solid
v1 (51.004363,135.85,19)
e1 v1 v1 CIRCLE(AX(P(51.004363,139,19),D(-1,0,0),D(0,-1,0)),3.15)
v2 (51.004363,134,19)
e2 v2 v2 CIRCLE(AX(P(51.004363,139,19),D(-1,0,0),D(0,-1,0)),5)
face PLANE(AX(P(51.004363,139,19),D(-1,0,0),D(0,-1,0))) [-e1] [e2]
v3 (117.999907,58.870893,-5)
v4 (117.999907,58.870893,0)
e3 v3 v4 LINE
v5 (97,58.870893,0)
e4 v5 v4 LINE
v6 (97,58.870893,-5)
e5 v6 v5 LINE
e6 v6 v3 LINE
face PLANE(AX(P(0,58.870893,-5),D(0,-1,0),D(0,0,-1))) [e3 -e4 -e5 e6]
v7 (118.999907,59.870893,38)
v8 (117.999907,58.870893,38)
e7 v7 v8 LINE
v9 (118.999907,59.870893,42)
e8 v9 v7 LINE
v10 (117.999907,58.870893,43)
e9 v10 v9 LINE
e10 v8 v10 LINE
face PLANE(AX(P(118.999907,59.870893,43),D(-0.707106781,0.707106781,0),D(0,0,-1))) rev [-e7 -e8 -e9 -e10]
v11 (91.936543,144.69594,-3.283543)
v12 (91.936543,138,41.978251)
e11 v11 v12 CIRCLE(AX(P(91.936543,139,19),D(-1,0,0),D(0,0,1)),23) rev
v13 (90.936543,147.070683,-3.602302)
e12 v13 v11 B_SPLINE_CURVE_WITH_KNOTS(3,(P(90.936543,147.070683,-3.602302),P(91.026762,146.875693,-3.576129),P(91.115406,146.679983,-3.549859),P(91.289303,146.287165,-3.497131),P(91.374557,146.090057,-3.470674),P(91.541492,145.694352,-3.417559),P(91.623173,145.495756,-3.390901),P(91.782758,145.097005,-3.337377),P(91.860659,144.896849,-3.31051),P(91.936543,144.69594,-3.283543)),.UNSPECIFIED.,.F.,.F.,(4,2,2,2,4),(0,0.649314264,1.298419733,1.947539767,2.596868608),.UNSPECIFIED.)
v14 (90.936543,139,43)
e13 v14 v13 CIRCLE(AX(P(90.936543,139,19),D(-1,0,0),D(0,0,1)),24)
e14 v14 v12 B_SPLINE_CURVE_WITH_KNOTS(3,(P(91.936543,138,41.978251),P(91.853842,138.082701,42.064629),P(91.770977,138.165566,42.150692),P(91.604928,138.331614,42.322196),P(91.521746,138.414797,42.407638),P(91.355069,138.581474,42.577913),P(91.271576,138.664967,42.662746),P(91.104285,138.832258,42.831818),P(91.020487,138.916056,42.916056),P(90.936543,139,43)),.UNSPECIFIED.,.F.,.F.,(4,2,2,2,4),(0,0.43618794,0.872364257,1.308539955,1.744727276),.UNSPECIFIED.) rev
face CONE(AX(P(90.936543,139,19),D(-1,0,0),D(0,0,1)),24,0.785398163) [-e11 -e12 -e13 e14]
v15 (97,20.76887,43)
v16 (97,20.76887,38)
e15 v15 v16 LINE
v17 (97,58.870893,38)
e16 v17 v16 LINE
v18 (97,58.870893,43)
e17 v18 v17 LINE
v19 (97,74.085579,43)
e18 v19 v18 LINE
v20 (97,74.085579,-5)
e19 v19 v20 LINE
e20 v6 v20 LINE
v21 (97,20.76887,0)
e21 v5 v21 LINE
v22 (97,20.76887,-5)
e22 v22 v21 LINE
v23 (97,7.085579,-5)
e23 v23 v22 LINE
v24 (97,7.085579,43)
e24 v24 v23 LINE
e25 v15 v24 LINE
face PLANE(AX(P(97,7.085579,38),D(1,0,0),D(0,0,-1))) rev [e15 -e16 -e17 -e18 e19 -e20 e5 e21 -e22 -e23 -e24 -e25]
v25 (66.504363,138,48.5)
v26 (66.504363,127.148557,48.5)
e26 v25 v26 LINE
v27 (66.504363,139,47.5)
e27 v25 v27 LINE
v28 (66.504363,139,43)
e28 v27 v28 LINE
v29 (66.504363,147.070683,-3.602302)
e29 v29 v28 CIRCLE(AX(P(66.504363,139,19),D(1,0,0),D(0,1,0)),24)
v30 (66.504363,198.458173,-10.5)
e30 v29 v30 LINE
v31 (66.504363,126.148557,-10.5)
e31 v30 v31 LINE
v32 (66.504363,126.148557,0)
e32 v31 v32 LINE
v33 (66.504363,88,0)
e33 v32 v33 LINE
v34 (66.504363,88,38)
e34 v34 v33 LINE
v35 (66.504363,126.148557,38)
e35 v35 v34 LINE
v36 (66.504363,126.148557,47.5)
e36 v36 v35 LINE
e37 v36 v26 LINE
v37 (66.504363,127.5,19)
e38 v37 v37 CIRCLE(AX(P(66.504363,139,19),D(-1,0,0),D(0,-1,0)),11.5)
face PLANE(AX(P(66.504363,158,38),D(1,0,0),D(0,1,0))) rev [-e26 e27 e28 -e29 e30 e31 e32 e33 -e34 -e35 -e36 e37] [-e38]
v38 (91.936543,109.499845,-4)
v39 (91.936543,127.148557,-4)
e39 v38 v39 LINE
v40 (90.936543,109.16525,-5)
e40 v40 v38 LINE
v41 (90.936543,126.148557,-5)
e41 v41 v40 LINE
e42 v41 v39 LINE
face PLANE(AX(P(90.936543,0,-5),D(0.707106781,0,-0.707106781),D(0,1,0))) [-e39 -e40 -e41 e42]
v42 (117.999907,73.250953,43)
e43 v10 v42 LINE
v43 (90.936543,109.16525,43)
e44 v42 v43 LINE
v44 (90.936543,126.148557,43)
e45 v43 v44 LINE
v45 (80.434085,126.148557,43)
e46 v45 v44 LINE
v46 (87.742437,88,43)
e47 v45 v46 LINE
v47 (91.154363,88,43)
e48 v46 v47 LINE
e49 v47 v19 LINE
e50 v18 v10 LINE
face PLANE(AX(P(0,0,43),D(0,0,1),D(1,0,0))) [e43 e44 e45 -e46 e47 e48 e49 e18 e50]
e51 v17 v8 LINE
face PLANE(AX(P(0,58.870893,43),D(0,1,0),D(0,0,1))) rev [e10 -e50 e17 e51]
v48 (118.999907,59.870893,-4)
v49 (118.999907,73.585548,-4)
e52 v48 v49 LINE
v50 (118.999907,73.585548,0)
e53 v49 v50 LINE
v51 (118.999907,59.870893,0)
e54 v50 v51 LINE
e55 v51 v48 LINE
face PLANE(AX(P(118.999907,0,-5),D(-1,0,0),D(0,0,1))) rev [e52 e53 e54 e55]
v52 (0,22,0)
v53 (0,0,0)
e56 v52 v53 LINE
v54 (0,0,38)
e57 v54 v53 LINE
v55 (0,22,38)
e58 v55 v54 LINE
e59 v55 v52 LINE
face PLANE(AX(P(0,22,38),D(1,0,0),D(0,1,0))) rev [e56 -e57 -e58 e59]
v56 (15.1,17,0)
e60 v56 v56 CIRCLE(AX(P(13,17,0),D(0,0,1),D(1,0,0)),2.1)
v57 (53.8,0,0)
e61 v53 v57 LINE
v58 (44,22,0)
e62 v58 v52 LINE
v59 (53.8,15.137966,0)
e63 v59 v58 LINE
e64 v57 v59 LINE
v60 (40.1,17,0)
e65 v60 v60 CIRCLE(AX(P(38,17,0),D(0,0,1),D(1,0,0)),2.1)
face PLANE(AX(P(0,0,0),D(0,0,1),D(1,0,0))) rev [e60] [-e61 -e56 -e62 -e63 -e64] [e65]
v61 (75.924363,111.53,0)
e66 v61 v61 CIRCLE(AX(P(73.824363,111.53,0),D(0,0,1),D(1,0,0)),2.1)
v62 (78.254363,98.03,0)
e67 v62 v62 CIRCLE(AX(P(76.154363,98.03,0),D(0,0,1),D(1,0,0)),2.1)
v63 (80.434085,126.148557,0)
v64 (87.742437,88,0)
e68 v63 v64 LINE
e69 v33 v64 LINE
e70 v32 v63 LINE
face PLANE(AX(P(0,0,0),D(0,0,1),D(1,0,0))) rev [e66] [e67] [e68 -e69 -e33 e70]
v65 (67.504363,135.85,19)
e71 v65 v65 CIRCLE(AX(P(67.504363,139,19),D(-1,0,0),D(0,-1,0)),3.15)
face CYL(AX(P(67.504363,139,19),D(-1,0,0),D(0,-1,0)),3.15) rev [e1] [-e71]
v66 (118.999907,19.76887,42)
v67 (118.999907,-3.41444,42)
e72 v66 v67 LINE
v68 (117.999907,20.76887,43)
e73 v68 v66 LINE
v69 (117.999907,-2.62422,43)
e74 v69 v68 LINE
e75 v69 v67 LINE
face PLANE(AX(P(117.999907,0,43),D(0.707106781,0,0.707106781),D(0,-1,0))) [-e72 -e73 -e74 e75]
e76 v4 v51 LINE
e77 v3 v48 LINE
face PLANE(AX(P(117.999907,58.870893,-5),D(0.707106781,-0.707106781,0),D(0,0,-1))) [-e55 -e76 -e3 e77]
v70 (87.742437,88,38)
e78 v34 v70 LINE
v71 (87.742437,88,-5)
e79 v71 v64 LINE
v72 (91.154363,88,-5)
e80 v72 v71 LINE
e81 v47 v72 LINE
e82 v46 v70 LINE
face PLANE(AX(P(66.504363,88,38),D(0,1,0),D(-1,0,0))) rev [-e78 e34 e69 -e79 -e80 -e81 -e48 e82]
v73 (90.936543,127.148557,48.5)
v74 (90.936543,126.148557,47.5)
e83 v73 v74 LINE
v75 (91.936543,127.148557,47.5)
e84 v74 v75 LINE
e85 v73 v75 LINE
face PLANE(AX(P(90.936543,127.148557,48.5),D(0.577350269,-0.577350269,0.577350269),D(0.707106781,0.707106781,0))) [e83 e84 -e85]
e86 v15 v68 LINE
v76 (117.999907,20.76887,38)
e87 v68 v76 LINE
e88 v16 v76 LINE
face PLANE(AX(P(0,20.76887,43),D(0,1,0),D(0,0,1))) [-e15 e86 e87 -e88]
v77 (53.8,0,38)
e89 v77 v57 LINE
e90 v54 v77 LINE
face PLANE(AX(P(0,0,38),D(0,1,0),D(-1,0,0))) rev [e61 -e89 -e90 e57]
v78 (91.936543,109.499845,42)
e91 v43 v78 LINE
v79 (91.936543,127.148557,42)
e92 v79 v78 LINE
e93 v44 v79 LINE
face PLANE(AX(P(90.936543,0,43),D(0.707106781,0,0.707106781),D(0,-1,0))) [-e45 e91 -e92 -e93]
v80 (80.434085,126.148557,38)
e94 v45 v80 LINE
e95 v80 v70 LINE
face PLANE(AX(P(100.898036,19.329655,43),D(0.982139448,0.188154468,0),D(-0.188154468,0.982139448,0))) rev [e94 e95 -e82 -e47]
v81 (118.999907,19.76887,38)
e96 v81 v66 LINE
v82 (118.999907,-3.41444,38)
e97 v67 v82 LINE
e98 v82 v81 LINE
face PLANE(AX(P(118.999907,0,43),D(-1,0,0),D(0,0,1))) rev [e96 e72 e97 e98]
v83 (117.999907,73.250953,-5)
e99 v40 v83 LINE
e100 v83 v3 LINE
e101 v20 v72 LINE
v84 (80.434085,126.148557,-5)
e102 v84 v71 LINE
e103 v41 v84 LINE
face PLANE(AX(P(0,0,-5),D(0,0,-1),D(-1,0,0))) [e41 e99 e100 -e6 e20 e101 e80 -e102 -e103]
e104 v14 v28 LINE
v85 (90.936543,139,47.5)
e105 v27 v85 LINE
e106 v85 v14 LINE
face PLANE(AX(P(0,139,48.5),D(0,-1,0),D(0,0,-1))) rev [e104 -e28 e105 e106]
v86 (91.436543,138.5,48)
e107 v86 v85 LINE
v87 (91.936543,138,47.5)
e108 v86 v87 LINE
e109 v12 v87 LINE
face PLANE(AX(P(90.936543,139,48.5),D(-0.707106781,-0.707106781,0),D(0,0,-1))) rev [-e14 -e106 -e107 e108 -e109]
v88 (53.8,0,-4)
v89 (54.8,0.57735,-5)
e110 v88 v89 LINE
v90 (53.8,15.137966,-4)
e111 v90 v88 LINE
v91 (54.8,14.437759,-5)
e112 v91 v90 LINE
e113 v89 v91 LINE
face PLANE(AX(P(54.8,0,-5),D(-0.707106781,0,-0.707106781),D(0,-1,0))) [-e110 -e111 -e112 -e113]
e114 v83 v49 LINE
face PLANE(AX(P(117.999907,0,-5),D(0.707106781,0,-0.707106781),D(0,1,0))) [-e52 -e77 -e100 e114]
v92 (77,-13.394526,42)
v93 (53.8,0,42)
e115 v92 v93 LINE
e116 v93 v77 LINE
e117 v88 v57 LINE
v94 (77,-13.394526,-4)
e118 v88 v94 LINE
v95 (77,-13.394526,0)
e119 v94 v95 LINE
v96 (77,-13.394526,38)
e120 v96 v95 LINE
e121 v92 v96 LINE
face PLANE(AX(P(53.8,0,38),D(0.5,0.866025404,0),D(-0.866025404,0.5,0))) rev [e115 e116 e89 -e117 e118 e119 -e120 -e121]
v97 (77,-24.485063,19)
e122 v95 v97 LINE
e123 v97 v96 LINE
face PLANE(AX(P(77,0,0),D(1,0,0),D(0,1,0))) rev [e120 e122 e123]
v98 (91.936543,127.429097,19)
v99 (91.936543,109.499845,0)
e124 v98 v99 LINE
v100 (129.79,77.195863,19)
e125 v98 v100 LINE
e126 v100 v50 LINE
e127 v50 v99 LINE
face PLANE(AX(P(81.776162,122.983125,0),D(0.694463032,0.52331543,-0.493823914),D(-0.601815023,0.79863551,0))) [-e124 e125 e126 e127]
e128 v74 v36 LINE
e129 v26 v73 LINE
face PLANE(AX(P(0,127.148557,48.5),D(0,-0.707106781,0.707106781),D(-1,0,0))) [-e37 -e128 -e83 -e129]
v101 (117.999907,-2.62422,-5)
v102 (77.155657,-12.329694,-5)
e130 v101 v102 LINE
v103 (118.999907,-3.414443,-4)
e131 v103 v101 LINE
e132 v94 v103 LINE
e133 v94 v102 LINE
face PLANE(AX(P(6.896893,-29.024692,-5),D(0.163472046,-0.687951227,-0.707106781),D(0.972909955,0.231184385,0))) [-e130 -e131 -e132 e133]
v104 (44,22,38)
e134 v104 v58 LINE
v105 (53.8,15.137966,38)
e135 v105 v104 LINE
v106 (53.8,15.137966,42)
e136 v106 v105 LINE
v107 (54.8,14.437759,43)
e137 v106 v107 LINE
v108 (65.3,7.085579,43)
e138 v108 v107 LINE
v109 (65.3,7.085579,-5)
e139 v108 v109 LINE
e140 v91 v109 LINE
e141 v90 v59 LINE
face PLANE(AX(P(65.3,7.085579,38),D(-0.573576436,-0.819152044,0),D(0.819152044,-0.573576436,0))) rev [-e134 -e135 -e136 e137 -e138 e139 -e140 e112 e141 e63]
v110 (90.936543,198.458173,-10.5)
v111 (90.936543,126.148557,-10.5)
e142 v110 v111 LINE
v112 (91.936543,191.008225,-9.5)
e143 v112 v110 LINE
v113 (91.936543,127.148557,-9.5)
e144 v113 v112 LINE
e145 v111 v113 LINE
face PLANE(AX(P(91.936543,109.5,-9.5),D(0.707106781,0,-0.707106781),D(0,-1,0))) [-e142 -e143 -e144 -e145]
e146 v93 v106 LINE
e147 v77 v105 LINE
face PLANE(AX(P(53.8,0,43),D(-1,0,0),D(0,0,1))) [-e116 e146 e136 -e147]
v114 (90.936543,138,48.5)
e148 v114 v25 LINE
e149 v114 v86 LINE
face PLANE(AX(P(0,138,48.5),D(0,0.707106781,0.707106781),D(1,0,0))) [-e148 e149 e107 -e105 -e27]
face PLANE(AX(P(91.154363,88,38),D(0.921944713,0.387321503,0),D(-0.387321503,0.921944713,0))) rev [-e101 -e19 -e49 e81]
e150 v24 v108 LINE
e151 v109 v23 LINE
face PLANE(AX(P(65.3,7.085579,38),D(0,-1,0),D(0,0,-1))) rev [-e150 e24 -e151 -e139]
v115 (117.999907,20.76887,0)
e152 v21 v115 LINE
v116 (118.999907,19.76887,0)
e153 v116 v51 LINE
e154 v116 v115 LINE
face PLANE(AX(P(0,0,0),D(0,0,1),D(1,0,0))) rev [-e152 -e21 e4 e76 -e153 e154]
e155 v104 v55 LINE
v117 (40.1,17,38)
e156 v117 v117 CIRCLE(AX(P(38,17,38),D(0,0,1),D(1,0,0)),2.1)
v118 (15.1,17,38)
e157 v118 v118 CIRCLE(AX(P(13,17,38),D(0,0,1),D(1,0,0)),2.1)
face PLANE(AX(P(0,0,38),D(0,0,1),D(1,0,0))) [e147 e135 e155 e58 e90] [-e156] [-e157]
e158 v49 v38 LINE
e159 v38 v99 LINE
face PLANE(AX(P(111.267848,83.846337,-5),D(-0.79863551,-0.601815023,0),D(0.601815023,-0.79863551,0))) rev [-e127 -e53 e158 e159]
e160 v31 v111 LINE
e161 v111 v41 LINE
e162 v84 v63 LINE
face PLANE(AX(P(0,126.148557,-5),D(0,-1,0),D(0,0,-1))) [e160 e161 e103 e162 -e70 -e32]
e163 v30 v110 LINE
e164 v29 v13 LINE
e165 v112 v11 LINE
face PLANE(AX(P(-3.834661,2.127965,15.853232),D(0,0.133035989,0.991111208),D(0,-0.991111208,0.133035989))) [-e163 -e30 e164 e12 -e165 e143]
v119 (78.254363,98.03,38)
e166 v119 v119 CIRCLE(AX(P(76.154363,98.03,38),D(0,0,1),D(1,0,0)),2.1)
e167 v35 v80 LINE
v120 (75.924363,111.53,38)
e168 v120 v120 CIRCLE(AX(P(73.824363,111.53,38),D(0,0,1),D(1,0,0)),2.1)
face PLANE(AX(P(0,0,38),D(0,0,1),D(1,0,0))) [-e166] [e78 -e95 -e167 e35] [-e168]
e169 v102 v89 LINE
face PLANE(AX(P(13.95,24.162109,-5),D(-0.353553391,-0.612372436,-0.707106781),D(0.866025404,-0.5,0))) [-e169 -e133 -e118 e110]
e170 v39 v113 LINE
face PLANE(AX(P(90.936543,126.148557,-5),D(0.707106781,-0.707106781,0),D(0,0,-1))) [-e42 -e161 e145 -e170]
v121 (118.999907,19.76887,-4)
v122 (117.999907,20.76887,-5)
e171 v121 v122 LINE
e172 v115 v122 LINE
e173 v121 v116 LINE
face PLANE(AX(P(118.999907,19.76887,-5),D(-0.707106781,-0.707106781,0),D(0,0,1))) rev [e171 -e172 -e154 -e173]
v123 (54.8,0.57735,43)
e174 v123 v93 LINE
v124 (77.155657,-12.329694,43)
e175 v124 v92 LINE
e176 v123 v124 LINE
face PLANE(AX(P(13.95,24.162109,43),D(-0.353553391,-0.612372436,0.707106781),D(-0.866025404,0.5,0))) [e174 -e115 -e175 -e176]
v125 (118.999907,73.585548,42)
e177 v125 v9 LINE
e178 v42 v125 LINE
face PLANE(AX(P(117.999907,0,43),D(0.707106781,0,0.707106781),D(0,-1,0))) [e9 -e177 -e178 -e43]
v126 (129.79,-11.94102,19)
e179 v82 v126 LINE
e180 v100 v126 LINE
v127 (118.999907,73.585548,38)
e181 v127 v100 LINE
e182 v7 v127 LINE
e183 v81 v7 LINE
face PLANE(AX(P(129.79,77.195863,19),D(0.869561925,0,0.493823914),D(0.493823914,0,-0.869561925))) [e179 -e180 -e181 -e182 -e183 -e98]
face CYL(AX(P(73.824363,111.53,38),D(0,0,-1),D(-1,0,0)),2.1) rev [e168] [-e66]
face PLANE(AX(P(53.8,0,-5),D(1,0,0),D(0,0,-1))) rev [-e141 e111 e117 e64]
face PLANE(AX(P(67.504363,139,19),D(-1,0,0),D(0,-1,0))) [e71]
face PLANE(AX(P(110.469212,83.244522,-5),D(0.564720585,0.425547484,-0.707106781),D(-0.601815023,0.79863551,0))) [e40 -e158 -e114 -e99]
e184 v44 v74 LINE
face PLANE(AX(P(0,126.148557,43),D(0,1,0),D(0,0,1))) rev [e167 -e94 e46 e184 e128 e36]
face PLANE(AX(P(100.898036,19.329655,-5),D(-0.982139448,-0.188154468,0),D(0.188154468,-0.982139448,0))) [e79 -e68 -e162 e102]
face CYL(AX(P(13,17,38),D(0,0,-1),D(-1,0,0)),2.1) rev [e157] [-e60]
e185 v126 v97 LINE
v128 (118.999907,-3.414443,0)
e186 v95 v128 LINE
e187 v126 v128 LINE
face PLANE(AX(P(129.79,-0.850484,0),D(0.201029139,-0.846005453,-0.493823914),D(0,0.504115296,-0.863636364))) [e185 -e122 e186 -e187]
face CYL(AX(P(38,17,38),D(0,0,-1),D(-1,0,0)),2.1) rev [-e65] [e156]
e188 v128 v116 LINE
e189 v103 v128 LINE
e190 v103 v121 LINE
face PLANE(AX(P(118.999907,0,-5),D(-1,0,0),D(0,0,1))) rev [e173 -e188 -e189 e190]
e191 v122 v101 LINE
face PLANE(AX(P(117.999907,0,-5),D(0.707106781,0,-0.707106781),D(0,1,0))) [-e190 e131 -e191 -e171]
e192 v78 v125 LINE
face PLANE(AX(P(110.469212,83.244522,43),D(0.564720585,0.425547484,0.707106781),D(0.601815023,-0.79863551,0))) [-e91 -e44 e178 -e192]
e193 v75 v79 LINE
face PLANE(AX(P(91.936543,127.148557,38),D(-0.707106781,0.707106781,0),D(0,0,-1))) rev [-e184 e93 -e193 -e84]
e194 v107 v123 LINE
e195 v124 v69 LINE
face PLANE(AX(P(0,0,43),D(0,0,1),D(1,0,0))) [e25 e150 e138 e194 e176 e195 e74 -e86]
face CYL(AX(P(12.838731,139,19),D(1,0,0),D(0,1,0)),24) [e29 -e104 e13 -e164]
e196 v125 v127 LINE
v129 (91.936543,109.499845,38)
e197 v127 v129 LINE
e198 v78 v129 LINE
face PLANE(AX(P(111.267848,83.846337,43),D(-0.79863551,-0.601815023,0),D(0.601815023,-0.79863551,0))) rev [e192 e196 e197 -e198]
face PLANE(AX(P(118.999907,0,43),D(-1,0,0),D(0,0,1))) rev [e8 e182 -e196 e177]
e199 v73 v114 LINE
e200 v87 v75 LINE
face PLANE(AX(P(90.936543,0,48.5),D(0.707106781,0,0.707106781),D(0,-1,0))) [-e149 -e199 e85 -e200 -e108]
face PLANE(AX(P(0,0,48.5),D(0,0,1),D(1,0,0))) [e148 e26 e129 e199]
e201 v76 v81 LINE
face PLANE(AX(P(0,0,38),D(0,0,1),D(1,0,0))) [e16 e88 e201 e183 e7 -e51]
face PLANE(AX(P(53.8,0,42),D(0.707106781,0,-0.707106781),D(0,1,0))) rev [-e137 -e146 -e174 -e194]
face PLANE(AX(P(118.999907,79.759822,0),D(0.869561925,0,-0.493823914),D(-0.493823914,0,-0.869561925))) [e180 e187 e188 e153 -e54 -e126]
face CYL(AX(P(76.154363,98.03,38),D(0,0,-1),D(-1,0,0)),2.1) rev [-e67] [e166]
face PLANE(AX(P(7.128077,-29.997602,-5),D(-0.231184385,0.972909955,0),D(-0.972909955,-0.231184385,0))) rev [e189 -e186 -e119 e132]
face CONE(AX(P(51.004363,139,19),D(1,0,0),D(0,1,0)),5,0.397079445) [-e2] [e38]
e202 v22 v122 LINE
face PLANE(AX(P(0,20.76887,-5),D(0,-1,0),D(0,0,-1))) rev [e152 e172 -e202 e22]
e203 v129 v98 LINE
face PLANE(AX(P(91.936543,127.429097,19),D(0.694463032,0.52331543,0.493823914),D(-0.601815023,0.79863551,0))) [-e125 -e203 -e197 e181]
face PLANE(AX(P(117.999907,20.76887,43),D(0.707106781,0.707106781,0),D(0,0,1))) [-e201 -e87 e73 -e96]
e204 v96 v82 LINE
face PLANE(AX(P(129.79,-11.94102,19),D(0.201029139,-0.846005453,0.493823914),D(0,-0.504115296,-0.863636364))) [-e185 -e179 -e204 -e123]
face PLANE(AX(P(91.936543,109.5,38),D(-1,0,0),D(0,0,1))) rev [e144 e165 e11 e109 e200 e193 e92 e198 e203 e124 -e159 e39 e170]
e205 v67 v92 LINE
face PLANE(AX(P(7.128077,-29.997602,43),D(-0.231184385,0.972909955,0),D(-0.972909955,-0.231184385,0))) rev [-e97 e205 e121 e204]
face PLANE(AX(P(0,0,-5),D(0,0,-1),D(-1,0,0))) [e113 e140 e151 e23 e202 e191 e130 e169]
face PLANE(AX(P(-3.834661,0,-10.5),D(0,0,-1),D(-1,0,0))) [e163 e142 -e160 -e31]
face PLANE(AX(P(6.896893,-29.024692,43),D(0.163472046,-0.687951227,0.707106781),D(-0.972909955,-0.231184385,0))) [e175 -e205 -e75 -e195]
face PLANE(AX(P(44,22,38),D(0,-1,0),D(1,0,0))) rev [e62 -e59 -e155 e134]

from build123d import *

# Parameters (mm, degrees)
SKETCH_1_R          = 2.1
EXTRUDE_1_DEPTH     = 38
CUT_EXTRUDE_1_DEPTH = 187.709206858
SKETCH_3_R          = 3.15
CUT_EXTRUDE_3_DEPTH = 1
EXTRUDE_2_DEPTH     = 5
EXTRUDE_3_DEPTH     = 5
EXTRUDE_2_2_DEPTH   = 25.432180104
EXTRUDE_7_DEPTH     = 25.432180104
SKETCH_18_W         = 25.432180104
SKETCH_18_H         = 5.5
EXTRUDE_8_DEPTH     = 2.30961622
EXTRUDE_10_DEPTH    = 5.5
SKETCH_21_R         = 5
SKETCH_20_R         = 11.5
SKETCH_23_R         = 3.15
CUT_EXTRUDE_4_DEPTH = 15.5
CHAMFER_1_SIZE      = 1


with BuildPart() as part:
    # 草图1 → 凸台-拉伸1 (new body)
    with BuildSketch(Plane.XY):
        Polygon((0, 0), (53.8, 0), (77, -13.394526245), (119, -3.414420564), (119, 73.585579436), (91.936542927, 109.5), (91.936542927, 158), (66.504362823, 158), (66.504362823, 88), (91.154362823, 88), (97, 74.085579436), (97, 7.085579436), (65.3, 7.085579436), (44, 22), (0, 22), align=None)
        with Locations((73.824362823, 111.53)):
            Circle(SKETCH_1_R, mode=Mode.SUBTRACT)
        with Locations((76.154362823, 98.03)):
            Circle(SKETCH_1_R, mode=Mode.SUBTRACT)
        with Locations((13, 17)):
            Circle(SKETCH_1_R, mode=Mode.SUBTRACT)
        with Locations((38, 17)):
            Circle(SKETCH_1_R, mode=Mode.SUBTRACT)
    extrude(amount=EXTRUDE_1_DEPTH)

    # 草图2 → 切除-拉伸1 (cut, through all)
    with BuildSketch(Plane(origin=(91.936542927, 0, 0), x_dir=(0, 0, -1), z_dir=(1, 0, 0))):
        with BuildLine():
            Line((-38, 158), (-38, 139))
            ThreePointArc((-38, 139), (-32.435028843, 152.435028843), (-19, 158))
            Line((-19, 158), (-38, 158))
        make_face()
        with BuildLine():
            Line((0, 158), (-19, 158))
            ThreePointArc((-19, 158), (-5.564971157, 152.435028843), (0, 139))
            Line((0, 139), (0, 158))
        make_face()
    extrude(amount=-CUT_EXTRUDE_1_DEPTH, mode=Mode.SUBTRACT)

    # 草图3 → 切除-拉伸3 (cut)
    with BuildSketch(Plane.ZY.offset(-66.504362823)):
        with Locations(Location((19, 139, 0), (0, 0, 270))):
            Circle(SKETCH_3_R)
    extrude(amount=-CUT_EXTRUDE_3_DEPTH, mode=Mode.SUBTRACT)

    # 扫描3: sweep along a path in 草图13
    with BuildLine(Plane.XY.offset(19)) as sweep_3_path:
        Line((91.936542927, 127.429097123), (129.79, 77.195862934))
        Line((129.79, 77.195862934), (129.79, -11.941020396))
        Line((129.79, -11.941020396), (77, -24.485062752))
    # 草图4 → 扫描3 (sweep)
    with BuildSketch(Plane.ZY.offset(-77)):
        Polygon((38, -13.394526245), (0, -13.394526245), (19, -24.485062752), align=None)
    sweep(path=sweep_3_path.line, transition=Transition.RIGHT)

    # 草图14 → Extrude 2 (add)
    with BuildSketch(Plane.XY.offset(38)):
        Polygon((66.504362823, 139), (66.504362823, 126.148557267), (80.434084519, 126.148557267), (87.742437222, 88), (91.154362823, 88), (97, 74.085579436), (97, 58.870893274), (118.999906629, 58.870893274), (118.999906629, 73.585548195), (91.936542927, 109.499844851), (91.936542927, 139), align=None)
        Polygon((118.999906629, 20.768869661), (97, 20.768869661), (97, 7.085579436), (65.3, 7.085579436), (53.8, 15.137966126), (53.8, 0), (77, -13.394526245), (118.999906629, -3.414439978), align=None)
    extrude(amount=EXTRUDE_2_DEPTH)

    # 草图15 → 凸台-拉伸3 (add)
    with BuildSketch(Plane(origin=(0, 0, 0), x_dir=(-1, 0, 0), z_dir=(0, 0, -1))):
        Polygon((-118.999906629, 73.585548195), (-118.999906629, 58.870893274), (-97, 58.870893274), (-97, 74.085579436), (-91.154362823, 88), (-87.742437222, 88), (-80.434084519, 126.148557267), (-66.504362823, 126.148557267), (-66.504362823, 139), (-91.936542927, 139), (-91.936542927, 109.499844851), align=None)
        Polygon((-77, -13.394526245), (-53.8, 0), (-53.8, 15.137966126), (-65.3, 7.085579436), (-97, 7.085579436), (-97, 20.768869661), (-118.999906629, 20.768869661), (-118.999906629, -3.414442751), align=None)
    extrude(amount=EXTRUDE_3_DEPTH)

    # 草图16 → Extrude 2 2 (add)
    with BuildSketch(Plane(origin=(91.936542927, 0, 0), x_dir=(0, 0, -1), z_dir=(1, 0, 0))):
        with BuildLine():
            ThreePointArc((-43, 139), (-19, 163), (5, 139))
            Line((5, 139), (-5, 139))
            ThreePointArc((-5, 139), (-19, 153), (-33, 139))
            Line((-33, 139), (-43, 139))
        make_face()
    extrude(amount=-EXTRUDE_2_2_DEPTH)

    # 草图17 → 凸台-拉伸7 (add)
    with BuildSketch(Plane(origin=(91.936542927, 0, 0), x_dir=(0, 0, -1), z_dir=(1, 0, 0))):
        with BuildLine():
            Line((5, 139), (5, 128.458173487))
            Line((5, 128.458173487), (10.5, 128.458173487))
            Line((10.5, 128.458173487), (10.5, 198.458173487))
            Line((10.5, 198.458173487), (3.602302269, 147.070683498))
            ThreePointArc((3.602302269, 147.070683498), (4.647994148, 143.095408742), (5, 139))
        make_face()
    extrude(amount=-EXTRUDE_7_DEPTH)

    # 草图18 → 凸台-拉伸8 (add)
    with BuildSketch(Plane.XZ.offset(-128.458173487)):
        with Locations((79.220452875, -7.75)):
            Rectangle(SKETCH_18_W, SKETCH_18_H)
    extrude(amount=EXTRUDE_8_DEPTH)

    # 草图19 → 凸台-拉伸10 (add)
    with BuildSketch(Plane.XY.offset(43)):
        Polygon((66.504362823, 126.148557267), (80.434084519, 126.148557267), (91.936542927, 126.148557267), (91.936542927, 139), (66.504362823, 139), align=None)
    extrude(amount=EXTRUDE_10_DEPTH)

    # 草图21 → 放样1 section 0
    with BuildSketch(Plane.ZY.offset(-51.004362823)):
        with Locations((19, 139)):
            Circle(SKETCH_21_R)
    # 草图20 → 放样1 section 1
    with BuildSketch(Plane.ZY.offset(-66.504362823)):
        with Locations((19, 139)):
            Circle(SKETCH_20_R)
    loft()

    # 草图23 → 切除-拉伸4 (cut)
    with BuildSketch(Plane.ZY.offset(-51.004362823)):
        with Locations(Location((19, 139, 0), (0, 0, 270))):
            Circle(SKETCH_23_R)
    extrude(amount=-CUT_EXTRUDE_4_DEPTH, mode=Mode.SUBTRACT)

    # 倒角1
    chamfer_1_edges = [part.edges().sort_by_distance(p)[0] for p in [
        (79.220452875, 139, 48.5),
    ]]
    chamfer(chamfer_1_edges, length=CHAMFER_1_SIZE)

    # 倒角3
    # the kernel refuses this chamfer: 1 mm, written as the material it takes off along each edge
    with BuildSketch(Plane(origin=(91.26987626, 126.815223933, 47.833333333), x_dir=(-0.7071067811865475, 0, 0.7071067811865475), z_dir=(0.5773502691896258, -0.5773502691896258, 0.5773502691896258))) as chamfer_3_piece_1:
        Polygon((-0.707106781, -0.40824829), (0.707106781, -0.40824829), (0, 0.816496581), align=None)
    extrude(amount=1.270170592, mode=Mode.SUBTRACT)
    with BuildSketch(Plane(origin=(53.8, 17.709649114, 43), x_dir=(0.9996219169112968, 0, 0.027495876610589005), z_dir=(0, -1, 0)), Plane(origin=(53.8, -2.571682988, -5), x_dir=(0.9996219169112968, 0, -0.027495876610586414), z_dir=(0, 1, 0))) as chamfer_3_piece_2:
        with BuildLine():
            Line((1.028673195, 0), (-0.056547155, -1.027117794))
            Line((-0.056547155, -1.027117794), (-0.076539593, -1.026567876))
            ThreePointArc((-0.076539593, -1.026567876), (-0.034129227, -0.51339783), (-0.019992438, 0.000549918))
            Line((-0.019992438, 0.000549918), (0.000549918, 0.019992438))
            ThreePointArc((0.000549918, 0.019992438), (0.514497665, 0.00585565), (1.029223113, 0.019992438))
            Line((1.029223113, 0.019992438), (1.028673195, 0))
        make_face()
    extrude(amount=20.281332101, mode=Mode.SUBTRACT)
    with BuildSketch(Plane(origin=(118.999906629, 20.768869661, 38), x_dir=(-0.9996219169112968, 0.02749587661058574, 0), z_dir=(0, 0, 1)), Plane(origin=(118.999906629, 58.870893274, 38), x_dir=(0.027495876610582105, 0.999621916911297, 0), z_dir=(0, 0, 1)), Plane(origin=(118.999906629, 58.870893274, 0), x_dir=(-0.9996219169112968, -0.027495876610589196, 0), z_dir=(0, 0, -1))) as chamfer_3_piece_3:
        with BuildLine():
            Line((1.028673195, 0), (-0.056547155, 1.027117794))
            Line((-0.056547155, 1.027117794), (-0.076539593, 1.026567876))
            ThreePointArc((-0.076539593, 1.026567876), (-0.034129227, 0.51339783), (-0.019992438, -0.000549918))
            Line((-0.019992438, -0.000549918), (0.000549918, -0.019992438))
            ThreePointArc((0.000549918, -0.019992438), (0.514497665, -0.00585565), (1.029223113, -0.019992438))
            Line((1.029223113, -0.019992438), (1.028673195, 0))
        make_face()
    extrude(amount=7.571682988, mode=Mode.SUBTRACT)
    with BuildSketch(Plane(origin=(51.572857202, 1.285841494, 43), x_dir=(0.4998109584556499, 0.8656979742248793, 0.027495876610589116), z_dir=(0.8660254037844378, -0.5000000000000017, 0)), Plane(origin=(79.227142798, -14.680367739, -5), x_dir=(0.49981095845565, 0.8656979742248795, -0.027495876610586535), z_dir=(-0.8660254037844378, 0.5000000000000017, 0))) as chamfer_3_piece_4:
        with BuildLine():
            Line((1.028673195, 0), (-0.056547155, -1.027117794))
            Line((-0.056547155, -1.027117794), (-0.076539593, -1.026567876))
            ThreePointArc((-0.076539593, -1.026567876), (-0.034129227, -0.51339783), (-0.019992438, 0.000549918))
            Line((-0.019992438, 0.000549918), (0.000549918, 0.019992438))
            ThreePointArc((0.000549918, 0.019992438), (0.514497665, 0.00585565), (1.029223113, 0.019992438))
            Line((1.029223113, 0.019992438), (1.028673195, 0))
        make_face()
    extrude(amount=31.932418466, mode=Mode.SUBTRACT)
    with BuildSketch(Plane(origin=(74.497984058, -13.989059351, 43), x_dir=(0.006356618994580412, -0.0267510116732474, -0.9996219169112968), z_dir=(0.9729099403562855, 0.23118444574825722, 0))) as chamfer_3_piece_5:
        with BuildLine():
            Line((1.028673195, 0), (-0.056547155, 1.027117794))
            Line((-0.056547155, 1.027117794), (-0.076539593, 1.026567876))
            ThreePointArc((-0.076539593, 1.026567876), (-0.034129227, 0.51339783), (-0.019992438, -0.000549918))
            Line((-0.019992438, -0.000549918), (0.000549918, -0.019992438))
            ThreePointArc((0.000549918, -0.019992438), (0.514497665, -0.00585565), (1.029223113, -0.019992438))
            Line((1.029223113, -0.019992438), (1.028673195, 0))
        make_face()
    extrude(amount=48.312733341, mode=Mode.SUBTRACT)
    with BuildSketch(Plane(origin=(118.999906629, -5.986122965, 43), x_dir=(0.027495876610582105, 0, -0.999621916911297), z_dir=(0, 1, 0))) as chamfer_3_piece_6:
        with BuildLine():
            Line((1.028673195, 0), (-0.056547155, 1.027117794))
            Line((-0.056547155, 1.027117794), (-0.076539593, 1.026567876))
            ThreePointArc((-0.076539593, 1.026567876), (-0.034129227, 0.51339783), (-0.019992438, -0.000549918))
            Line((-0.019992438, -0.000549918), (0.000549918, -0.019992438))
            ThreePointArc((0.000549918, -0.019992438), (0.514497665, -0.00585565), (1.029223113, -0.019992438))
            Line((1.029223113, -0.019992438), (1.028673195, 0))
        make_face()
    extrude(amount=29.326675615, mode=Mode.SUBTRACT)
    with BuildSketch(Plane(origin=(118.999906629, 56.299210286, 43), x_dir=(-0.9996219169112968, 0, 0.027495876610589196), z_dir=(0, 1, 0)), Plane(origin=(118.999906629, 76.157231183, -5), x_dir=(-0.9996219169112968, 0, -0.027495876610586605), z_dir=(0, -1, 0))) as chamfer_3_piece_7:
        with BuildLine():
            Line((1.028673195, 0), (-0.056547155, -1.027117794))
            Line((-0.056547155, -1.027117794), (-0.076539593, -1.026567876))
            ThreePointArc((-0.076539593, -1.026567876), (-0.034129227, -0.51339783), (-0.019992438, 0.000549918))
            Line((-0.019992438, 0.000549918), (0.000549918, 0.019992438))
            ThreePointArc((0.000549918, 0.019992438), (0.514497665, 0.00585565), (1.029223113, 0.019992438))
            Line((1.029223113, 0.019992438), (1.028673195, 0))
        make_face()
    extrude(amount=19.858020896, mode=Mode.SUBTRACT)
    with BuildSketch(Plane(origin=(120.547584086, 71.53171084, 43), x_dir=(-0.7983335594669047, -0.6015874870692686, 0.027495876610589096), z_dir=(-0.60181502315205, 0.7986355100472916, 0))) as chamfer_3_piece_8_section:
        with BuildLine():
            Line((1.028673195, 0), (-0.056547155, -1.027117794))
            Line((-0.056547155, -1.027117794), (-0.076539593, -1.026567876))
            ThreePointArc((-0.076539593, -1.026567876), (-0.034129227, -0.51339783), (-0.019992438, 0.000549918))
            Line((-0.019992438, 0.000549918), (0.000549918, 0.019992438))
            ThreePointArc((0.000549918, 0.019992438), (0.514497665, 0.00585565), (1.029223113, 0.019992438))
            Line((1.029223113, 0.019992438), (1.028673195, 0))
        make_face()
    chamfer_3_piece_8 = extrude(amount=50.112937457, mode=Mode.PRIVATE)
    chamfer_3_piece_8 = split(chamfer_3_piece_8, bisect_by=Plane(origin=(91.936542927, 90.144566019, 42.669249939), z_dir=(1, 0, 0)), keep=Keep.TOP, mode=Mode.PRIVATE)
    add(chamfer_3_piece_8, mode=Mode.SUBTRACT)
    with BuildSketch(Plane(origin=(91.936542927, 106.928161863, 43), x_dir=(0.027495876610582105, 0, -0.999621916911297), z_dir=(0, 1, 0))) as chamfer_3_piece_9_section:
        with BuildLine():
            Line((1.028673195, 0), (-0.056547155, 1.027117794))
            Line((-0.056547155, 1.027117794), (-0.076539593, 1.026567876))
            ThreePointArc((-0.076539593, 1.026567876), (-0.034129227, 0.51339783), (-0.019992438, -0.000549918))
            Line((-0.019992438, -0.000549918), (0.000549918, -0.019992438))
            ThreePointArc((0.000549918, -0.019992438), (0.514497665, -0.00585565), (1.029223113, -0.019992438))
            Line((1.029223113, -0.019992438), (1.028673195, 0))
        make_face()
    chamfer_3_piece_9 = extrude(amount=19.220395404, mode=Mode.PRIVATE)
    chamfer_3_piece_9 = split(chamfer_3_piece_9, bisect_by=Plane(origin=(87.71452173, 115.102656217, 42.667427315), z_dir=(0.7986355100472916, 0.60181502315205, 0)), keep=Keep.TOP, mode=Mode.PRIVATE)
    add(chamfer_3_piece_9, mode=Mode.SUBTRACT)
    with BuildSketch(Plane(origin=(90.38886547, 111.553682205, -5), x_dir=(-0.7983335594669051, -0.6015874870692681, -0.027495876610586504), z_dir=(0.6018150231520495, -0.7986355100472919, 0))) as chamfer_3_piece_10_section:
        with BuildLine():
            Line((1.028673195, 0), (-0.056547155, -1.027117794))
            Line((-0.056547155, -1.027117794), (-0.076539593, -1.026567876))
            ThreePointArc((-0.076539593, -1.026567876), (-0.034129227, -0.51339783), (-0.019992438, 0.000549918))
            Line((-0.019992438, 0.000549918), (0.000549918, 0.019992438))
            ThreePointArc((0.000549918, 0.019992438), (0.514497665, 0.00585565), (1.029223113, 0.019992438))
            Line((1.029223113, 0.019992438), (1.028673195, 0))
        make_face()
    chamfer_3_piece_10 = extrude(amount=50.112937457, mode=Mode.PRIVATE)
    chamfer_3_piece_10 = split(chamfer_3_piece_10, bisect_by=Plane(origin=(91.936542927, 90.144566019, -4.669249939), z_dir=(1, 0, 0)), keep=Keep.TOP, mode=Mode.PRIVATE)
    add(chamfer_3_piece_10, mode=Mode.SUBTRACT)
    with BuildSketch(Plane(origin=(118.999906629, 20.768869661, 0), x_dir=(-0.9996219169112968, 0.02749587661058574, 0), z_dir=(0, 0, -1))) as chamfer_3_piece_11:
        with BuildLine():
            Line((1.028673195, 0), (-0.056547155, -1.027117794))
            Line((-0.056547155, -1.027117794), (-0.076539593, -1.026567876))
            ThreePointArc((-0.076539593, -1.026567876), (-0.034129227, -0.51339783), (-0.019992438, 0.000549918))
            Line((-0.019992438, 0.000549918), (0.000549918, 0.019992438))
            ThreePointArc((0.000549918, 0.019992438), (0.514497665, 0.00585565), (1.029223113, 0.019992438))
            Line((1.029223113, 0.019992438), (1.028673195, 0))
        make_face()
    extrude(amount=7.571682988, mode=Mode.SUBTRACT)
    with BuildSketch(Plane(origin=(118.999906629, 23.340552649, -5), x_dir=(0.02749587661058217, 0, 0.9996219169112968), z_dir=(0, -1, 0))) as chamfer_3_piece_12:
        with BuildLine():
            Line((1.028673195, 0), (-0.056547155, 1.027117794))
            Line((-0.056547155, 1.027117794), (-0.076539593, 1.026567876))
            ThreePointArc((-0.076539593, 1.026567876), (-0.034129227, 0.51339783), (-0.019992438, -0.000549918))
            Line((-0.019992438, -0.000549918), (0.000549918, -0.019992438))
            ThreePointArc((0.000549918, -0.019992438), (0.514497665, -0.00585565), (1.029223113, -0.019992438))
            Line((1.029223113, -0.019992438), (1.028673195, 0))
        make_face()
    extrude(amount=29.326678388, mode=Mode.SUBTRACT)
    with BuildSketch(Plane(origin=(121.501922608, -2.819909801, -5), x_dir=(-0.2310969780314448, 0.9725421140054292, -0.027495876610586514), z_dir=(-0.9729099548061726, -0.231184384937762, 0))) as chamfer_3_piece_13:
        with BuildLine():
            Line((1.028673195, 0), (-0.056547155, -1.027117794))
            Line((-0.056547155, -1.027117794), (-0.076539593, -1.026567876))
            ThreePointArc((-0.076539593, -1.026567876), (-0.034129227, -0.51339783), (-0.019992438, 0.000549918))
            Line((-0.019992438, 0.000549918), (0.000549918, 0.019992438))
            ThreePointArc((0.000549918, 0.019992438), (0.514497665, 0.00585565), (1.029223113, 0.019992438))
            Line((1.029223113, 0.019992438), (1.028673195, 0))
        make_face()
    extrude(amount=48.3127327, mode=Mode.SUBTRACT)
    with BuildSketch(Plane(origin=(91.936542927, 139, 19), x_dir=(0, 0, 1), z_dir=(0, -1, 0))) as chamfer_3_piece_14_section:
        with BuildLine():
            Line((22.971715729, -0.028284271), (24.028284271, 1.028284271))
            Line((24.028284271, 1.028284271), (24.048284271, 1.028284271))
            ThreePointArc((24.048284271, 1.028284271), (24.02, 0.514142136), (24.02, 0))
            Line((24.02, 0), (24, -0.02))
            ThreePointArc((24, -0.02), (23.485857864, -0.02), (22.971715729, -0.048284271))
            Line((22.971715729, -0.048284271), (22.971715729, -0.028284271))
        make_face()
    chamfer_3_piece_14 = revolve(axis=Axis((91.936542927, 139, 19), (-1, 0, 0)), revolution_arc=166.496974045, mode=Mode.PRIVATE)
    chamfer_3_piece_14 = split(chamfer_3_piece_14, bisect_by=Plane(origin=(91.460066415, 158.711193826, -5.164797766), z_dir=(0, 0.13303598850024104, 0.9911112075664182)), keep=Keep.TOP, mode=Mode.PRIVATE)
    add(chamfer_3_piece_14, mode=Mode.SUBTRACT)
    with BuildSketch(Plane(origin=(91.936542927, 123.576874279, -10.5), x_dir=(0.0274958766105822, 0, 0.999621916911297), z_dir=(0, 1, 0))) as chamfer_3_piece_15:
        with BuildLine():
            Line((1.028673195, 0), (-0.056547155, -1.027117794))
            Line((-0.056547155, -1.027117794), (-0.076539593, -1.026567876))
            ThreePointArc((-0.076539593, -1.026567876), (-0.034129227, -0.51339783), (-0.019992438, 0.000549918))
            Line((-0.019992438, 0.000549918), (0.000549918, 0.019992438))
            ThreePointArc((0.000549918, 0.019992438), (0.514497665, 0.00585565), (1.029223113, 0.019992438))
            Line((1.029223113, 0.019992438), (1.028673195, 0))
        make_face()
    extrude(amount=77.452982196, mode=Mode.SUBTRACT)
    with BuildSketch(Plane(origin=(91.936542927, 126.148557267, -5), x_dir=(0.02749587661058217, 0, 0.9996219169112968), z_dir=(0, -1, 0))) as chamfer_3_piece_16_section:
        with BuildLine():
            Line((1.028673195, 0), (-0.056547155, 1.027117794))
            Line((-0.056547155, 1.027117794), (-0.076539593, 1.026567876))
            ThreePointArc((-0.076539593, 1.026567876), (-0.034129227, 0.51339783), (-0.019992438, -0.000549918))
            Line((-0.019992438, -0.000549918), (0.000549918, -0.019992438))
            ThreePointArc((0.000549918, -0.019992438), (0.514497665, -0.00585565), (1.029223113, -0.019992438))
            Line((1.029223113, -0.019992438), (1.028673195, 0))
        make_face()
    chamfer_3_piece_16 = extrude(amount=19.220395404, mode=Mode.PRIVATE)
    chamfer_3_piece_16 = split(chamfer_3_piece_16, bisect_by=Plane(origin=(87.71452173, 115.102656217, -4.667427315), z_dir=(0.7986355100472919, 0.6018150231520495, 0)), keep=Keep.TOP, mode=Mode.PRIVATE)
    add(chamfer_3_piece_16, mode=Mode.SUBTRACT)
    with BuildSketch(Plane(origin=(91.936542927, 126.148557267, -13.071682988), x_dir=(0.02749587661058229, 0.9996219169112968, 0), z_dir=(0, 0, 1)), Plane(origin=(91.936542927, 126.148557267, 43), x_dir=(0.02749587661058229, 0.9996219169112968, 0), z_dir=(0, 0, 1))) as chamfer_3_piece_17:
        with BuildLine():
            Line((1.028673195, 0), (-0.056547155, 1.027117794))
            Line((-0.056547155, 1.027117794), (-0.076539593, 1.026567876))
            ThreePointArc((-0.076539593, 1.026567876), (-0.034129227, 0.51339783), (-0.019992438, -0.000549918))
            Line((-0.019992438, -0.000549918), (0.000549918, -0.019992438))
            ThreePointArc((0.000549918, -0.019992438), (0.514497665, -0.00585565), (1.029223113, -0.019992438))
            Line((1.029223113, -0.019992438), (1.028673195, 0))
        make_face()
    extrude(amount=8.071682988, mode=Mode.SUBTRACT)
    with BuildSketch(Plane(origin=(94.508225915, 126.148557267, 48.5), x_dir=(0, 0.9996219169112968, 0.027495876610589196), z_dir=(-1, 0, 0))) as chamfer_3_piece_18:
        with BuildLine():
            Line((1.028673195, 0), (-0.056547155, 1.027117794))
            Line((-0.056547155, 1.027117794), (-0.076539593, 1.026567876))
            ThreePointArc((-0.076539593, 1.026567876), (-0.034129227, 0.51339783), (-0.019992438, -0.000549918))
            Line((-0.019992438, -0.000549918), (0.000549918, -0.019992438))
            ThreePointArc((0.000549918, -0.019992438), (0.514497665, -0.00585565), (1.029223113, -0.019992438))
            Line((1.029223113, -0.019992438), (1.028673195, 0))
        make_face()
    extrude(amount=30.575546079, mode=Mode.SUBTRACT)
    with BuildSketch(Plane(origin=(91.936542927, 123.576874279, 48.5), x_dir=(0.027495876610582105, 0, -0.999621916911297), z_dir=(0, 1, 0))) as chamfer_3_piece_19:
        with BuildLine():
            Line((1.028673195, 0), (-0.056547155, 1.027117794))
            Line((-0.056547155, 1.027117794), (-0.076539593, 1.026567876))
            ThreePointArc((-0.076539593, 1.026567876), (-0.034129227, 0.51339783), (-0.019992438, -0.000549918))
            Line((-0.019992438, -0.000549918), (0.000549918, -0.019992438))
            ThreePointArc((0.000549918, -0.019992438), (0.514497665, -0.00585565), (1.029223113, -0.019992438))
            Line((1.029223113, -0.019992438), (1.028673195, 0))
        make_face()
    extrude(amount=16.994808709, mode=Mode.SUBTRACT)
    with BuildSketch(Plane(origin=(91.936542927, 139, 40.428317012), x_dir=(-0.999621916911297, 0.027495876610582292, 0), z_dir=(0, 0, 1))) as chamfer_3_piece_20_section:
        with BuildLine():
            Line((1.028673195, 0), (-0.056547155, 1.027117794))
            Line((-0.056547155, 1.027117794), (-0.076539593, 1.026567876))
            ThreePointArc((-0.076539593, 1.026567876), (-0.034129227, 0.51339783), (-0.019992438, -0.000549918))
            Line((-0.019992438, -0.000549918), (0.000549918, -0.019992438))
            ThreePointArc((0.000549918, -0.019992438), (0.514497665, -0.00585565), (1.029223113, -0.019992438))
            Line((1.029223113, -0.019992438), (1.028673195, 0))
        make_face()
    chamfer_3_piece_20 = extrude(amount=9.643365976, mode=Mode.PRIVATE)
    chamfer_3_piece_20 = chamfer_3_piece_20 - Plane(origin=(91.606828487, 139, 19), x_dir=(0, 0, 1), z_dir=(1, 0, 0)) * Cylinder(24, 24, mode=Mode.PRIVATE)
    add(chamfer_3_piece_20, mode=Mode.SUBTRACT)
    with BuildSketch(Plane(origin=(91.936542927, 106.928161863, 43), x_dir=(0.027495876610582105, 0, -0.999621916911297), z_dir=(0, 1, 0))) as chamfer_3_piece_21a_section:
        with BuildLine():
            Line((1.028673195, 0), (-0.056547155, 1.027117794))
            Line((-0.056547155, 1.027117794), (-0.076539593, 1.026567876))
            ThreePointArc((-0.076539593, 1.026567876), (-0.034129227, 0.51339783), (-0.019992438, -0.000549918))
            Line((-0.019992438, -0.000549918), (0.000549918, -0.019992438))
            ThreePointArc((0.000549918, -0.019992438), (0.514497665, -0.00585565), (1.029223113, -0.019992438))
            Line((1.029223113, -0.019992438), (1.028673195, 0))
        make_face()
    chamfer_3_piece_21a = extrude(amount=19.220395404, mode=Mode.PRIVATE)
    chamfer_3_piece_21a = split(chamfer_3_piece_21a, bisect_by=Plane(origin=(92.310865996, 109.003101361, 42.685176958), z_dir=(-0.7986355100472916, -0.60181502315205, 0)), keep=Keep.TOP, mode=Mode.PRIVATE)
    with BuildSketch(Plane(origin=(120.547584086, 71.53171084, 43), x_dir=(-0.7983335594669047, -0.6015874870692686, 0.027495876610589096), z_dir=(-0.60181502315205, 0.7986355100472916, 0))) as chamfer_3_piece_21b_section:
        with BuildLine():
            Line((1.028673195, 0), (-0.056547155, -1.027117794))
            Line((-0.056547155, -1.027117794), (-0.076539593, -1.026567876))
            ThreePointArc((-0.076539593, -1.026567876), (-0.034129227, -0.51339783), (-0.019992438, 0.000549918))
            Line((-0.019992438, 0.000549918), (0.000549918, 0.019992438))
            ThreePointArc((0.000549918, 0.019992438), (0.514497665, 0.00585565), (1.029223113, 0.019992438))
            Line((1.029223113, 0.019992438), (1.028673195, 0))
        make_face()
    chamfer_3_piece_21b = extrude(amount=50.112937457, mode=Mode.PRIVATE)
    chamfer_3_piece_21b = split(chamfer_3_piece_21b, bisect_by=Plane(origin=(91.936542927, 110.121835087, 42.685176958), z_dir=(-1, 0, 0)), keep=Keep.TOP, mode=Mode.PRIVATE)
    chamfer_3_piece_21 = chamfer_3_piece_21a & chamfer_3_piece_21b
    add(chamfer_3_piece_21, mode=Mode.SUBTRACT)
    with BuildSketch(Plane(origin=(91.936542927, 126.148557267, 40.428317012), x_dir=(0.02749587661058229, 0.9996219169112968, 0), z_dir=(0, 0, 1))) as chamfer_3_piece_22a_section:
        with BuildLine():
            Line((1.028673195, 0), (-0.056547155, 1.027117794))
            Line((-0.056547155, 1.027117794), (-0.076539593, 1.026567876))
            ThreePointArc((-0.076539593, 1.026567876), (-0.034129227, 0.51339783), (-0.019992438, -0.000549918))
            Line((-0.019992438, -0.000549918), (0.000549918, -0.019992438))
            ThreePointArc((0.000549918, -0.019992438), (0.514497665, -0.00585565), (1.029223113, -0.019992438))
            Line((1.029223113, -0.019992438), (1.028673195, 0))
        make_face()
    chamfer_3_piece_22a = extrude(amount=10.643365976, mode=Mode.PRIVATE)
    chamfer_3_piece_22a = split(chamfer_3_piece_22a, bisect_by=Plane(origin=(91.6067493, 126.478350894, 43), z_dir=(0, 0, -1)), keep=Keep.TOP, mode=Mode.PRIVATE)
    with BuildSketch(Plane(origin=(91.936542927, 106.928161863, 43), x_dir=(0.027495876610582105, 0, -0.999621916911297), z_dir=(0, 1, 0))) as chamfer_3_piece_22b_section:
        with BuildLine():
            Line((1.028673195, 0), (-0.056547155, 1.027117794))
            Line((-0.056547155, 1.027117794), (-0.076539593, 1.026567876))
            ThreePointArc((-0.076539593, 1.026567876), (-0.034129227, 0.51339783), (-0.019992438, -0.000549918))
            Line((-0.019992438, -0.000549918), (0.000549918, -0.019992438))
            ThreePointArc((0.000549918, -0.019992438), (0.514497665, -0.00585565), (1.029223113, -0.019992438))
            Line((1.029223113, -0.019992438), (1.028673195, 0))
        make_face()
    chamfer_3_piece_22b = extrude(amount=21.792078392, mode=Mode.PRIVATE)
    chamfer_3_piece_22b = split(chamfer_3_piece_22b, bisect_by=Plane(origin=(91.6067493, 126.148557267, 42.670206373), z_dir=(0, 1, 0)), keep=Keep.TOP, mode=Mode.PRIVATE)
    chamfer_3_piece_22 = chamfer_3_piece_22a & chamfer_3_piece_22b
    add(chamfer_3_piece_22, mode=Mode.SUBTRACT)
    with BuildSketch(Plane(origin=(91.936542927, 126.148557267, -5), x_dir=(0.02749587661058217, 0, 0.9996219169112968), z_dir=(0, -1, 0))) as chamfer_3_piece_23a_section:
        with BuildLine():
            Line((1.028673195, 0), (-0.056547155, 1.027117794))
            Line((-0.056547155, 1.027117794), (-0.076539593, 1.026567876))
            ThreePointArc((-0.076539593, 1.026567876), (-0.034129227, 0.51339783), (-0.019992438, -0.000549918))
            Line((-0.019992438, -0.000549918), (0.000549918, -0.019992438))
            ThreePointArc((0.000549918, -0.019992438), (0.514497665, -0.00585565), (1.029223113, -0.019992438))
            Line((1.029223113, -0.019992438), (1.028673195, 0))
        make_face()
    chamfer_3_piece_23a = extrude(amount=19.220395404, mode=Mode.PRIVATE)
    chamfer_3_piece_23a = split(chamfer_3_piece_23a, bisect_by=Plane(origin=(92.310865996, 109.003101361, -4.685176958), z_dir=(-0.7986355100472919, -0.6018150231520495, 0)), keep=Keep.TOP, mode=Mode.PRIVATE)
    with BuildSketch(Plane(origin=(90.38886547, 111.553682205, -5), x_dir=(-0.7983335594669051, -0.6015874870692681, -0.027495876610586504), z_dir=(0.6018150231520495, -0.7986355100472919, 0))) as chamfer_3_piece_23b_section:
        with BuildLine():
            Line((1.028673195, 0), (-0.056547155, -1.027117794))
            Line((-0.056547155, -1.027117794), (-0.076539593, -1.026567876))
            ThreePointArc((-0.076539593, -1.026567876), (-0.034129227, -0.51339783), (-0.019992438, 0.000549918))
            Line((-0.019992438, 0.000549918), (0.000549918, 0.019992438))
            ThreePointArc((0.000549918, 0.019992438), (0.514497665, 0.00585565), (1.029223113, 0.019992438))
            Line((1.029223113, 0.019992438), (1.028673195, 0))
        make_face()
    chamfer_3_piece_23b = extrude(amount=50.112937457, mode=Mode.PRIVATE)
    chamfer_3_piece_23b = split(chamfer_3_piece_23b, bisect_by=Plane(origin=(91.936542927, 110.121835087, -4.685176958), z_dir=(-1, 0, 0)), keep=Keep.TOP, mode=Mode.PRIVATE)
    chamfer_3_piece_23 = chamfer_3_piece_23a & chamfer_3_piece_23b
    add(chamfer_3_piece_23, mode=Mode.SUBTRACT)
    with BuildSketch(Plane(origin=(91.936542927, 139, 40.428317012), x_dir=(-0.999621916911297, 0.027495876610582292, 0), z_dir=(0, 0, 1))) as chamfer_3_piece_24a_section:
        with BuildLine():
            Line((1.028673195, 0), (-0.056547155, 1.027117794))
            Line((-0.056547155, 1.027117794), (-0.076539593, 1.026567876))
            ThreePointArc((-0.076539593, 1.026567876), (-0.034129227, 0.51339783), (-0.019992438, -0.000549918))
            Line((-0.019992438, -0.000549918), (0.000549918, -0.019992438))
            ThreePointArc((0.000549918, -0.019992438), (0.514497665, -0.00585565), (1.029223113, -0.019992438))
            Line((1.029223113, -0.019992438), (1.028673195, 0))
        make_face()
    chamfer_3_piece_24a = extrude(amount=9.643365976, mode=Mode.PRIVATE)
    chamfer_3_piece_24a = chamfer_3_piece_24a & Plane(origin=(91.606531136, 139, 19), x_dir=(0, 0, 1), z_dir=(1, 0, 0)) * Cylinder(24, 24, mode=Mode.PRIVATE)
    with BuildSketch(Plane(origin=(91.936542927, 139, 19), x_dir=(0, -0.10708445732496112, 0.9942499278347565), z_dir=(0, -0.9942499278347565, -0.10708445732496112))) as chamfer_3_piece_24b_section:
        with BuildLine():
            Line((22.971715729, -0.028284271), (24.028284271, 1.028284271))
            Line((24.028284271, 1.028284271), (24.048284271, 1.028284271))
            ThreePointArc((24.048284271, 1.028284271), (24.02, 0.514142136), (24.02, 0))
            Line((24.02, 0), (24, -0.02))
            ThreePointArc((24, -0.02), (23.485857864, -0.02), (22.971715729, -0.048284271))
            Line((22.971715729, -0.048284271), (22.971715729, -0.028284271))
        make_face()
    chamfer_3_piece_24b = revolve(axis=Axis((91.936542927, 139, 19), (-1, 0, 0)), revolution_arc=172.644248448, mode=Mode.PRIVATE)
    chamfer_3_piece_24b = split(chamfer_3_piece_24b, bisect_by=Plane(origin=(91.605315127, 139, 42.627498031), z_dir=(0, -1, 0)), keep=Keep.TOP, mode=Mode.PRIVATE)
    chamfer_3_piece_24 = chamfer_3_piece_24a & chamfer_3_piece_24b
    add(chamfer_3_piece_24, mode=Mode.SUBTRACT)
    with BuildSketch(Plane(origin=(91.936542927, 126.148557267, -13.071682988), x_dir=(0.02749587661058229, 0.9996219169112968, 0), z_dir=(0, 0, 1))) as chamfer_3_piece_25a_section:
        with BuildLine():
            Line((1.028673195, 0), (-0.056547155, 1.027117794))
            Line((-0.056547155, 1.027117794), (-0.076539593, 1.026567876))
            ThreePointArc((-0.076539593, 1.026567876), (-0.034129227, 0.51339783), (-0.019992438, -0.000549918))
            Line((-0.019992438, -0.000549918), (0.000549918, -0.019992438))
            ThreePointArc((0.000549918, -0.019992438), (0.514497665, -0.00585565), (1.029223113, -0.019992438))
            Line((1.029223113, -0.019992438), (1.028673195, 0))
        make_face()
    chamfer_3_piece_25a = extrude(amount=10.643365976, mode=Mode.PRIVATE)
    chamfer_3_piece_25a = split(chamfer_3_piece_25a, bisect_by=Plane(origin=(91.6067493, 126.478350893, -5), z_dir=(0, 0, 1)), keep=Keep.TOP, mode=Mode.PRIVATE)
    with BuildSketch(Plane(origin=(91.936542927, 128.720240255, -5), x_dir=(0.02749587661058217, 0, 0.9996219169112968), z_dir=(0, -1, 0))) as chamfer_3_piece_25b_section:
        with BuildLine():
            Line((1.028673195, 0), (-0.056547155, 1.027117794))
            Line((-0.056547155, 1.027117794), (-0.076539593, 1.026567876))
            ThreePointArc((-0.076539593, 1.026567876), (-0.034129227, 0.51339783), (-0.019992438, -0.000549918))
            Line((-0.019992438, -0.000549918), (0.000549918, -0.019992438))
            ThreePointArc((0.000549918, -0.019992438), (0.514497665, -0.00585565), (1.029223113, -0.019992438))
            Line((1.029223113, -0.019992438), (1.028673195, 0))
        make_face()
    chamfer_3_piece_25b = extrude(amount=21.792078392, mode=Mode.PRIVATE)
    chamfer_3_piece_25b = split(chamfer_3_piece_25b, bisect_by=Plane(origin=(91.6067493, 126.148557267, -4.670206373), z_dir=(0, 1, 0)), keep=Keep.TOP, mode=Mode.PRIVATE)
    chamfer_3_piece_25 = chamfer_3_piece_25a & chamfer_3_piece_25b
    add(chamfer_3_piece_25, mode=Mode.SUBTRACT)


solid = part.part
